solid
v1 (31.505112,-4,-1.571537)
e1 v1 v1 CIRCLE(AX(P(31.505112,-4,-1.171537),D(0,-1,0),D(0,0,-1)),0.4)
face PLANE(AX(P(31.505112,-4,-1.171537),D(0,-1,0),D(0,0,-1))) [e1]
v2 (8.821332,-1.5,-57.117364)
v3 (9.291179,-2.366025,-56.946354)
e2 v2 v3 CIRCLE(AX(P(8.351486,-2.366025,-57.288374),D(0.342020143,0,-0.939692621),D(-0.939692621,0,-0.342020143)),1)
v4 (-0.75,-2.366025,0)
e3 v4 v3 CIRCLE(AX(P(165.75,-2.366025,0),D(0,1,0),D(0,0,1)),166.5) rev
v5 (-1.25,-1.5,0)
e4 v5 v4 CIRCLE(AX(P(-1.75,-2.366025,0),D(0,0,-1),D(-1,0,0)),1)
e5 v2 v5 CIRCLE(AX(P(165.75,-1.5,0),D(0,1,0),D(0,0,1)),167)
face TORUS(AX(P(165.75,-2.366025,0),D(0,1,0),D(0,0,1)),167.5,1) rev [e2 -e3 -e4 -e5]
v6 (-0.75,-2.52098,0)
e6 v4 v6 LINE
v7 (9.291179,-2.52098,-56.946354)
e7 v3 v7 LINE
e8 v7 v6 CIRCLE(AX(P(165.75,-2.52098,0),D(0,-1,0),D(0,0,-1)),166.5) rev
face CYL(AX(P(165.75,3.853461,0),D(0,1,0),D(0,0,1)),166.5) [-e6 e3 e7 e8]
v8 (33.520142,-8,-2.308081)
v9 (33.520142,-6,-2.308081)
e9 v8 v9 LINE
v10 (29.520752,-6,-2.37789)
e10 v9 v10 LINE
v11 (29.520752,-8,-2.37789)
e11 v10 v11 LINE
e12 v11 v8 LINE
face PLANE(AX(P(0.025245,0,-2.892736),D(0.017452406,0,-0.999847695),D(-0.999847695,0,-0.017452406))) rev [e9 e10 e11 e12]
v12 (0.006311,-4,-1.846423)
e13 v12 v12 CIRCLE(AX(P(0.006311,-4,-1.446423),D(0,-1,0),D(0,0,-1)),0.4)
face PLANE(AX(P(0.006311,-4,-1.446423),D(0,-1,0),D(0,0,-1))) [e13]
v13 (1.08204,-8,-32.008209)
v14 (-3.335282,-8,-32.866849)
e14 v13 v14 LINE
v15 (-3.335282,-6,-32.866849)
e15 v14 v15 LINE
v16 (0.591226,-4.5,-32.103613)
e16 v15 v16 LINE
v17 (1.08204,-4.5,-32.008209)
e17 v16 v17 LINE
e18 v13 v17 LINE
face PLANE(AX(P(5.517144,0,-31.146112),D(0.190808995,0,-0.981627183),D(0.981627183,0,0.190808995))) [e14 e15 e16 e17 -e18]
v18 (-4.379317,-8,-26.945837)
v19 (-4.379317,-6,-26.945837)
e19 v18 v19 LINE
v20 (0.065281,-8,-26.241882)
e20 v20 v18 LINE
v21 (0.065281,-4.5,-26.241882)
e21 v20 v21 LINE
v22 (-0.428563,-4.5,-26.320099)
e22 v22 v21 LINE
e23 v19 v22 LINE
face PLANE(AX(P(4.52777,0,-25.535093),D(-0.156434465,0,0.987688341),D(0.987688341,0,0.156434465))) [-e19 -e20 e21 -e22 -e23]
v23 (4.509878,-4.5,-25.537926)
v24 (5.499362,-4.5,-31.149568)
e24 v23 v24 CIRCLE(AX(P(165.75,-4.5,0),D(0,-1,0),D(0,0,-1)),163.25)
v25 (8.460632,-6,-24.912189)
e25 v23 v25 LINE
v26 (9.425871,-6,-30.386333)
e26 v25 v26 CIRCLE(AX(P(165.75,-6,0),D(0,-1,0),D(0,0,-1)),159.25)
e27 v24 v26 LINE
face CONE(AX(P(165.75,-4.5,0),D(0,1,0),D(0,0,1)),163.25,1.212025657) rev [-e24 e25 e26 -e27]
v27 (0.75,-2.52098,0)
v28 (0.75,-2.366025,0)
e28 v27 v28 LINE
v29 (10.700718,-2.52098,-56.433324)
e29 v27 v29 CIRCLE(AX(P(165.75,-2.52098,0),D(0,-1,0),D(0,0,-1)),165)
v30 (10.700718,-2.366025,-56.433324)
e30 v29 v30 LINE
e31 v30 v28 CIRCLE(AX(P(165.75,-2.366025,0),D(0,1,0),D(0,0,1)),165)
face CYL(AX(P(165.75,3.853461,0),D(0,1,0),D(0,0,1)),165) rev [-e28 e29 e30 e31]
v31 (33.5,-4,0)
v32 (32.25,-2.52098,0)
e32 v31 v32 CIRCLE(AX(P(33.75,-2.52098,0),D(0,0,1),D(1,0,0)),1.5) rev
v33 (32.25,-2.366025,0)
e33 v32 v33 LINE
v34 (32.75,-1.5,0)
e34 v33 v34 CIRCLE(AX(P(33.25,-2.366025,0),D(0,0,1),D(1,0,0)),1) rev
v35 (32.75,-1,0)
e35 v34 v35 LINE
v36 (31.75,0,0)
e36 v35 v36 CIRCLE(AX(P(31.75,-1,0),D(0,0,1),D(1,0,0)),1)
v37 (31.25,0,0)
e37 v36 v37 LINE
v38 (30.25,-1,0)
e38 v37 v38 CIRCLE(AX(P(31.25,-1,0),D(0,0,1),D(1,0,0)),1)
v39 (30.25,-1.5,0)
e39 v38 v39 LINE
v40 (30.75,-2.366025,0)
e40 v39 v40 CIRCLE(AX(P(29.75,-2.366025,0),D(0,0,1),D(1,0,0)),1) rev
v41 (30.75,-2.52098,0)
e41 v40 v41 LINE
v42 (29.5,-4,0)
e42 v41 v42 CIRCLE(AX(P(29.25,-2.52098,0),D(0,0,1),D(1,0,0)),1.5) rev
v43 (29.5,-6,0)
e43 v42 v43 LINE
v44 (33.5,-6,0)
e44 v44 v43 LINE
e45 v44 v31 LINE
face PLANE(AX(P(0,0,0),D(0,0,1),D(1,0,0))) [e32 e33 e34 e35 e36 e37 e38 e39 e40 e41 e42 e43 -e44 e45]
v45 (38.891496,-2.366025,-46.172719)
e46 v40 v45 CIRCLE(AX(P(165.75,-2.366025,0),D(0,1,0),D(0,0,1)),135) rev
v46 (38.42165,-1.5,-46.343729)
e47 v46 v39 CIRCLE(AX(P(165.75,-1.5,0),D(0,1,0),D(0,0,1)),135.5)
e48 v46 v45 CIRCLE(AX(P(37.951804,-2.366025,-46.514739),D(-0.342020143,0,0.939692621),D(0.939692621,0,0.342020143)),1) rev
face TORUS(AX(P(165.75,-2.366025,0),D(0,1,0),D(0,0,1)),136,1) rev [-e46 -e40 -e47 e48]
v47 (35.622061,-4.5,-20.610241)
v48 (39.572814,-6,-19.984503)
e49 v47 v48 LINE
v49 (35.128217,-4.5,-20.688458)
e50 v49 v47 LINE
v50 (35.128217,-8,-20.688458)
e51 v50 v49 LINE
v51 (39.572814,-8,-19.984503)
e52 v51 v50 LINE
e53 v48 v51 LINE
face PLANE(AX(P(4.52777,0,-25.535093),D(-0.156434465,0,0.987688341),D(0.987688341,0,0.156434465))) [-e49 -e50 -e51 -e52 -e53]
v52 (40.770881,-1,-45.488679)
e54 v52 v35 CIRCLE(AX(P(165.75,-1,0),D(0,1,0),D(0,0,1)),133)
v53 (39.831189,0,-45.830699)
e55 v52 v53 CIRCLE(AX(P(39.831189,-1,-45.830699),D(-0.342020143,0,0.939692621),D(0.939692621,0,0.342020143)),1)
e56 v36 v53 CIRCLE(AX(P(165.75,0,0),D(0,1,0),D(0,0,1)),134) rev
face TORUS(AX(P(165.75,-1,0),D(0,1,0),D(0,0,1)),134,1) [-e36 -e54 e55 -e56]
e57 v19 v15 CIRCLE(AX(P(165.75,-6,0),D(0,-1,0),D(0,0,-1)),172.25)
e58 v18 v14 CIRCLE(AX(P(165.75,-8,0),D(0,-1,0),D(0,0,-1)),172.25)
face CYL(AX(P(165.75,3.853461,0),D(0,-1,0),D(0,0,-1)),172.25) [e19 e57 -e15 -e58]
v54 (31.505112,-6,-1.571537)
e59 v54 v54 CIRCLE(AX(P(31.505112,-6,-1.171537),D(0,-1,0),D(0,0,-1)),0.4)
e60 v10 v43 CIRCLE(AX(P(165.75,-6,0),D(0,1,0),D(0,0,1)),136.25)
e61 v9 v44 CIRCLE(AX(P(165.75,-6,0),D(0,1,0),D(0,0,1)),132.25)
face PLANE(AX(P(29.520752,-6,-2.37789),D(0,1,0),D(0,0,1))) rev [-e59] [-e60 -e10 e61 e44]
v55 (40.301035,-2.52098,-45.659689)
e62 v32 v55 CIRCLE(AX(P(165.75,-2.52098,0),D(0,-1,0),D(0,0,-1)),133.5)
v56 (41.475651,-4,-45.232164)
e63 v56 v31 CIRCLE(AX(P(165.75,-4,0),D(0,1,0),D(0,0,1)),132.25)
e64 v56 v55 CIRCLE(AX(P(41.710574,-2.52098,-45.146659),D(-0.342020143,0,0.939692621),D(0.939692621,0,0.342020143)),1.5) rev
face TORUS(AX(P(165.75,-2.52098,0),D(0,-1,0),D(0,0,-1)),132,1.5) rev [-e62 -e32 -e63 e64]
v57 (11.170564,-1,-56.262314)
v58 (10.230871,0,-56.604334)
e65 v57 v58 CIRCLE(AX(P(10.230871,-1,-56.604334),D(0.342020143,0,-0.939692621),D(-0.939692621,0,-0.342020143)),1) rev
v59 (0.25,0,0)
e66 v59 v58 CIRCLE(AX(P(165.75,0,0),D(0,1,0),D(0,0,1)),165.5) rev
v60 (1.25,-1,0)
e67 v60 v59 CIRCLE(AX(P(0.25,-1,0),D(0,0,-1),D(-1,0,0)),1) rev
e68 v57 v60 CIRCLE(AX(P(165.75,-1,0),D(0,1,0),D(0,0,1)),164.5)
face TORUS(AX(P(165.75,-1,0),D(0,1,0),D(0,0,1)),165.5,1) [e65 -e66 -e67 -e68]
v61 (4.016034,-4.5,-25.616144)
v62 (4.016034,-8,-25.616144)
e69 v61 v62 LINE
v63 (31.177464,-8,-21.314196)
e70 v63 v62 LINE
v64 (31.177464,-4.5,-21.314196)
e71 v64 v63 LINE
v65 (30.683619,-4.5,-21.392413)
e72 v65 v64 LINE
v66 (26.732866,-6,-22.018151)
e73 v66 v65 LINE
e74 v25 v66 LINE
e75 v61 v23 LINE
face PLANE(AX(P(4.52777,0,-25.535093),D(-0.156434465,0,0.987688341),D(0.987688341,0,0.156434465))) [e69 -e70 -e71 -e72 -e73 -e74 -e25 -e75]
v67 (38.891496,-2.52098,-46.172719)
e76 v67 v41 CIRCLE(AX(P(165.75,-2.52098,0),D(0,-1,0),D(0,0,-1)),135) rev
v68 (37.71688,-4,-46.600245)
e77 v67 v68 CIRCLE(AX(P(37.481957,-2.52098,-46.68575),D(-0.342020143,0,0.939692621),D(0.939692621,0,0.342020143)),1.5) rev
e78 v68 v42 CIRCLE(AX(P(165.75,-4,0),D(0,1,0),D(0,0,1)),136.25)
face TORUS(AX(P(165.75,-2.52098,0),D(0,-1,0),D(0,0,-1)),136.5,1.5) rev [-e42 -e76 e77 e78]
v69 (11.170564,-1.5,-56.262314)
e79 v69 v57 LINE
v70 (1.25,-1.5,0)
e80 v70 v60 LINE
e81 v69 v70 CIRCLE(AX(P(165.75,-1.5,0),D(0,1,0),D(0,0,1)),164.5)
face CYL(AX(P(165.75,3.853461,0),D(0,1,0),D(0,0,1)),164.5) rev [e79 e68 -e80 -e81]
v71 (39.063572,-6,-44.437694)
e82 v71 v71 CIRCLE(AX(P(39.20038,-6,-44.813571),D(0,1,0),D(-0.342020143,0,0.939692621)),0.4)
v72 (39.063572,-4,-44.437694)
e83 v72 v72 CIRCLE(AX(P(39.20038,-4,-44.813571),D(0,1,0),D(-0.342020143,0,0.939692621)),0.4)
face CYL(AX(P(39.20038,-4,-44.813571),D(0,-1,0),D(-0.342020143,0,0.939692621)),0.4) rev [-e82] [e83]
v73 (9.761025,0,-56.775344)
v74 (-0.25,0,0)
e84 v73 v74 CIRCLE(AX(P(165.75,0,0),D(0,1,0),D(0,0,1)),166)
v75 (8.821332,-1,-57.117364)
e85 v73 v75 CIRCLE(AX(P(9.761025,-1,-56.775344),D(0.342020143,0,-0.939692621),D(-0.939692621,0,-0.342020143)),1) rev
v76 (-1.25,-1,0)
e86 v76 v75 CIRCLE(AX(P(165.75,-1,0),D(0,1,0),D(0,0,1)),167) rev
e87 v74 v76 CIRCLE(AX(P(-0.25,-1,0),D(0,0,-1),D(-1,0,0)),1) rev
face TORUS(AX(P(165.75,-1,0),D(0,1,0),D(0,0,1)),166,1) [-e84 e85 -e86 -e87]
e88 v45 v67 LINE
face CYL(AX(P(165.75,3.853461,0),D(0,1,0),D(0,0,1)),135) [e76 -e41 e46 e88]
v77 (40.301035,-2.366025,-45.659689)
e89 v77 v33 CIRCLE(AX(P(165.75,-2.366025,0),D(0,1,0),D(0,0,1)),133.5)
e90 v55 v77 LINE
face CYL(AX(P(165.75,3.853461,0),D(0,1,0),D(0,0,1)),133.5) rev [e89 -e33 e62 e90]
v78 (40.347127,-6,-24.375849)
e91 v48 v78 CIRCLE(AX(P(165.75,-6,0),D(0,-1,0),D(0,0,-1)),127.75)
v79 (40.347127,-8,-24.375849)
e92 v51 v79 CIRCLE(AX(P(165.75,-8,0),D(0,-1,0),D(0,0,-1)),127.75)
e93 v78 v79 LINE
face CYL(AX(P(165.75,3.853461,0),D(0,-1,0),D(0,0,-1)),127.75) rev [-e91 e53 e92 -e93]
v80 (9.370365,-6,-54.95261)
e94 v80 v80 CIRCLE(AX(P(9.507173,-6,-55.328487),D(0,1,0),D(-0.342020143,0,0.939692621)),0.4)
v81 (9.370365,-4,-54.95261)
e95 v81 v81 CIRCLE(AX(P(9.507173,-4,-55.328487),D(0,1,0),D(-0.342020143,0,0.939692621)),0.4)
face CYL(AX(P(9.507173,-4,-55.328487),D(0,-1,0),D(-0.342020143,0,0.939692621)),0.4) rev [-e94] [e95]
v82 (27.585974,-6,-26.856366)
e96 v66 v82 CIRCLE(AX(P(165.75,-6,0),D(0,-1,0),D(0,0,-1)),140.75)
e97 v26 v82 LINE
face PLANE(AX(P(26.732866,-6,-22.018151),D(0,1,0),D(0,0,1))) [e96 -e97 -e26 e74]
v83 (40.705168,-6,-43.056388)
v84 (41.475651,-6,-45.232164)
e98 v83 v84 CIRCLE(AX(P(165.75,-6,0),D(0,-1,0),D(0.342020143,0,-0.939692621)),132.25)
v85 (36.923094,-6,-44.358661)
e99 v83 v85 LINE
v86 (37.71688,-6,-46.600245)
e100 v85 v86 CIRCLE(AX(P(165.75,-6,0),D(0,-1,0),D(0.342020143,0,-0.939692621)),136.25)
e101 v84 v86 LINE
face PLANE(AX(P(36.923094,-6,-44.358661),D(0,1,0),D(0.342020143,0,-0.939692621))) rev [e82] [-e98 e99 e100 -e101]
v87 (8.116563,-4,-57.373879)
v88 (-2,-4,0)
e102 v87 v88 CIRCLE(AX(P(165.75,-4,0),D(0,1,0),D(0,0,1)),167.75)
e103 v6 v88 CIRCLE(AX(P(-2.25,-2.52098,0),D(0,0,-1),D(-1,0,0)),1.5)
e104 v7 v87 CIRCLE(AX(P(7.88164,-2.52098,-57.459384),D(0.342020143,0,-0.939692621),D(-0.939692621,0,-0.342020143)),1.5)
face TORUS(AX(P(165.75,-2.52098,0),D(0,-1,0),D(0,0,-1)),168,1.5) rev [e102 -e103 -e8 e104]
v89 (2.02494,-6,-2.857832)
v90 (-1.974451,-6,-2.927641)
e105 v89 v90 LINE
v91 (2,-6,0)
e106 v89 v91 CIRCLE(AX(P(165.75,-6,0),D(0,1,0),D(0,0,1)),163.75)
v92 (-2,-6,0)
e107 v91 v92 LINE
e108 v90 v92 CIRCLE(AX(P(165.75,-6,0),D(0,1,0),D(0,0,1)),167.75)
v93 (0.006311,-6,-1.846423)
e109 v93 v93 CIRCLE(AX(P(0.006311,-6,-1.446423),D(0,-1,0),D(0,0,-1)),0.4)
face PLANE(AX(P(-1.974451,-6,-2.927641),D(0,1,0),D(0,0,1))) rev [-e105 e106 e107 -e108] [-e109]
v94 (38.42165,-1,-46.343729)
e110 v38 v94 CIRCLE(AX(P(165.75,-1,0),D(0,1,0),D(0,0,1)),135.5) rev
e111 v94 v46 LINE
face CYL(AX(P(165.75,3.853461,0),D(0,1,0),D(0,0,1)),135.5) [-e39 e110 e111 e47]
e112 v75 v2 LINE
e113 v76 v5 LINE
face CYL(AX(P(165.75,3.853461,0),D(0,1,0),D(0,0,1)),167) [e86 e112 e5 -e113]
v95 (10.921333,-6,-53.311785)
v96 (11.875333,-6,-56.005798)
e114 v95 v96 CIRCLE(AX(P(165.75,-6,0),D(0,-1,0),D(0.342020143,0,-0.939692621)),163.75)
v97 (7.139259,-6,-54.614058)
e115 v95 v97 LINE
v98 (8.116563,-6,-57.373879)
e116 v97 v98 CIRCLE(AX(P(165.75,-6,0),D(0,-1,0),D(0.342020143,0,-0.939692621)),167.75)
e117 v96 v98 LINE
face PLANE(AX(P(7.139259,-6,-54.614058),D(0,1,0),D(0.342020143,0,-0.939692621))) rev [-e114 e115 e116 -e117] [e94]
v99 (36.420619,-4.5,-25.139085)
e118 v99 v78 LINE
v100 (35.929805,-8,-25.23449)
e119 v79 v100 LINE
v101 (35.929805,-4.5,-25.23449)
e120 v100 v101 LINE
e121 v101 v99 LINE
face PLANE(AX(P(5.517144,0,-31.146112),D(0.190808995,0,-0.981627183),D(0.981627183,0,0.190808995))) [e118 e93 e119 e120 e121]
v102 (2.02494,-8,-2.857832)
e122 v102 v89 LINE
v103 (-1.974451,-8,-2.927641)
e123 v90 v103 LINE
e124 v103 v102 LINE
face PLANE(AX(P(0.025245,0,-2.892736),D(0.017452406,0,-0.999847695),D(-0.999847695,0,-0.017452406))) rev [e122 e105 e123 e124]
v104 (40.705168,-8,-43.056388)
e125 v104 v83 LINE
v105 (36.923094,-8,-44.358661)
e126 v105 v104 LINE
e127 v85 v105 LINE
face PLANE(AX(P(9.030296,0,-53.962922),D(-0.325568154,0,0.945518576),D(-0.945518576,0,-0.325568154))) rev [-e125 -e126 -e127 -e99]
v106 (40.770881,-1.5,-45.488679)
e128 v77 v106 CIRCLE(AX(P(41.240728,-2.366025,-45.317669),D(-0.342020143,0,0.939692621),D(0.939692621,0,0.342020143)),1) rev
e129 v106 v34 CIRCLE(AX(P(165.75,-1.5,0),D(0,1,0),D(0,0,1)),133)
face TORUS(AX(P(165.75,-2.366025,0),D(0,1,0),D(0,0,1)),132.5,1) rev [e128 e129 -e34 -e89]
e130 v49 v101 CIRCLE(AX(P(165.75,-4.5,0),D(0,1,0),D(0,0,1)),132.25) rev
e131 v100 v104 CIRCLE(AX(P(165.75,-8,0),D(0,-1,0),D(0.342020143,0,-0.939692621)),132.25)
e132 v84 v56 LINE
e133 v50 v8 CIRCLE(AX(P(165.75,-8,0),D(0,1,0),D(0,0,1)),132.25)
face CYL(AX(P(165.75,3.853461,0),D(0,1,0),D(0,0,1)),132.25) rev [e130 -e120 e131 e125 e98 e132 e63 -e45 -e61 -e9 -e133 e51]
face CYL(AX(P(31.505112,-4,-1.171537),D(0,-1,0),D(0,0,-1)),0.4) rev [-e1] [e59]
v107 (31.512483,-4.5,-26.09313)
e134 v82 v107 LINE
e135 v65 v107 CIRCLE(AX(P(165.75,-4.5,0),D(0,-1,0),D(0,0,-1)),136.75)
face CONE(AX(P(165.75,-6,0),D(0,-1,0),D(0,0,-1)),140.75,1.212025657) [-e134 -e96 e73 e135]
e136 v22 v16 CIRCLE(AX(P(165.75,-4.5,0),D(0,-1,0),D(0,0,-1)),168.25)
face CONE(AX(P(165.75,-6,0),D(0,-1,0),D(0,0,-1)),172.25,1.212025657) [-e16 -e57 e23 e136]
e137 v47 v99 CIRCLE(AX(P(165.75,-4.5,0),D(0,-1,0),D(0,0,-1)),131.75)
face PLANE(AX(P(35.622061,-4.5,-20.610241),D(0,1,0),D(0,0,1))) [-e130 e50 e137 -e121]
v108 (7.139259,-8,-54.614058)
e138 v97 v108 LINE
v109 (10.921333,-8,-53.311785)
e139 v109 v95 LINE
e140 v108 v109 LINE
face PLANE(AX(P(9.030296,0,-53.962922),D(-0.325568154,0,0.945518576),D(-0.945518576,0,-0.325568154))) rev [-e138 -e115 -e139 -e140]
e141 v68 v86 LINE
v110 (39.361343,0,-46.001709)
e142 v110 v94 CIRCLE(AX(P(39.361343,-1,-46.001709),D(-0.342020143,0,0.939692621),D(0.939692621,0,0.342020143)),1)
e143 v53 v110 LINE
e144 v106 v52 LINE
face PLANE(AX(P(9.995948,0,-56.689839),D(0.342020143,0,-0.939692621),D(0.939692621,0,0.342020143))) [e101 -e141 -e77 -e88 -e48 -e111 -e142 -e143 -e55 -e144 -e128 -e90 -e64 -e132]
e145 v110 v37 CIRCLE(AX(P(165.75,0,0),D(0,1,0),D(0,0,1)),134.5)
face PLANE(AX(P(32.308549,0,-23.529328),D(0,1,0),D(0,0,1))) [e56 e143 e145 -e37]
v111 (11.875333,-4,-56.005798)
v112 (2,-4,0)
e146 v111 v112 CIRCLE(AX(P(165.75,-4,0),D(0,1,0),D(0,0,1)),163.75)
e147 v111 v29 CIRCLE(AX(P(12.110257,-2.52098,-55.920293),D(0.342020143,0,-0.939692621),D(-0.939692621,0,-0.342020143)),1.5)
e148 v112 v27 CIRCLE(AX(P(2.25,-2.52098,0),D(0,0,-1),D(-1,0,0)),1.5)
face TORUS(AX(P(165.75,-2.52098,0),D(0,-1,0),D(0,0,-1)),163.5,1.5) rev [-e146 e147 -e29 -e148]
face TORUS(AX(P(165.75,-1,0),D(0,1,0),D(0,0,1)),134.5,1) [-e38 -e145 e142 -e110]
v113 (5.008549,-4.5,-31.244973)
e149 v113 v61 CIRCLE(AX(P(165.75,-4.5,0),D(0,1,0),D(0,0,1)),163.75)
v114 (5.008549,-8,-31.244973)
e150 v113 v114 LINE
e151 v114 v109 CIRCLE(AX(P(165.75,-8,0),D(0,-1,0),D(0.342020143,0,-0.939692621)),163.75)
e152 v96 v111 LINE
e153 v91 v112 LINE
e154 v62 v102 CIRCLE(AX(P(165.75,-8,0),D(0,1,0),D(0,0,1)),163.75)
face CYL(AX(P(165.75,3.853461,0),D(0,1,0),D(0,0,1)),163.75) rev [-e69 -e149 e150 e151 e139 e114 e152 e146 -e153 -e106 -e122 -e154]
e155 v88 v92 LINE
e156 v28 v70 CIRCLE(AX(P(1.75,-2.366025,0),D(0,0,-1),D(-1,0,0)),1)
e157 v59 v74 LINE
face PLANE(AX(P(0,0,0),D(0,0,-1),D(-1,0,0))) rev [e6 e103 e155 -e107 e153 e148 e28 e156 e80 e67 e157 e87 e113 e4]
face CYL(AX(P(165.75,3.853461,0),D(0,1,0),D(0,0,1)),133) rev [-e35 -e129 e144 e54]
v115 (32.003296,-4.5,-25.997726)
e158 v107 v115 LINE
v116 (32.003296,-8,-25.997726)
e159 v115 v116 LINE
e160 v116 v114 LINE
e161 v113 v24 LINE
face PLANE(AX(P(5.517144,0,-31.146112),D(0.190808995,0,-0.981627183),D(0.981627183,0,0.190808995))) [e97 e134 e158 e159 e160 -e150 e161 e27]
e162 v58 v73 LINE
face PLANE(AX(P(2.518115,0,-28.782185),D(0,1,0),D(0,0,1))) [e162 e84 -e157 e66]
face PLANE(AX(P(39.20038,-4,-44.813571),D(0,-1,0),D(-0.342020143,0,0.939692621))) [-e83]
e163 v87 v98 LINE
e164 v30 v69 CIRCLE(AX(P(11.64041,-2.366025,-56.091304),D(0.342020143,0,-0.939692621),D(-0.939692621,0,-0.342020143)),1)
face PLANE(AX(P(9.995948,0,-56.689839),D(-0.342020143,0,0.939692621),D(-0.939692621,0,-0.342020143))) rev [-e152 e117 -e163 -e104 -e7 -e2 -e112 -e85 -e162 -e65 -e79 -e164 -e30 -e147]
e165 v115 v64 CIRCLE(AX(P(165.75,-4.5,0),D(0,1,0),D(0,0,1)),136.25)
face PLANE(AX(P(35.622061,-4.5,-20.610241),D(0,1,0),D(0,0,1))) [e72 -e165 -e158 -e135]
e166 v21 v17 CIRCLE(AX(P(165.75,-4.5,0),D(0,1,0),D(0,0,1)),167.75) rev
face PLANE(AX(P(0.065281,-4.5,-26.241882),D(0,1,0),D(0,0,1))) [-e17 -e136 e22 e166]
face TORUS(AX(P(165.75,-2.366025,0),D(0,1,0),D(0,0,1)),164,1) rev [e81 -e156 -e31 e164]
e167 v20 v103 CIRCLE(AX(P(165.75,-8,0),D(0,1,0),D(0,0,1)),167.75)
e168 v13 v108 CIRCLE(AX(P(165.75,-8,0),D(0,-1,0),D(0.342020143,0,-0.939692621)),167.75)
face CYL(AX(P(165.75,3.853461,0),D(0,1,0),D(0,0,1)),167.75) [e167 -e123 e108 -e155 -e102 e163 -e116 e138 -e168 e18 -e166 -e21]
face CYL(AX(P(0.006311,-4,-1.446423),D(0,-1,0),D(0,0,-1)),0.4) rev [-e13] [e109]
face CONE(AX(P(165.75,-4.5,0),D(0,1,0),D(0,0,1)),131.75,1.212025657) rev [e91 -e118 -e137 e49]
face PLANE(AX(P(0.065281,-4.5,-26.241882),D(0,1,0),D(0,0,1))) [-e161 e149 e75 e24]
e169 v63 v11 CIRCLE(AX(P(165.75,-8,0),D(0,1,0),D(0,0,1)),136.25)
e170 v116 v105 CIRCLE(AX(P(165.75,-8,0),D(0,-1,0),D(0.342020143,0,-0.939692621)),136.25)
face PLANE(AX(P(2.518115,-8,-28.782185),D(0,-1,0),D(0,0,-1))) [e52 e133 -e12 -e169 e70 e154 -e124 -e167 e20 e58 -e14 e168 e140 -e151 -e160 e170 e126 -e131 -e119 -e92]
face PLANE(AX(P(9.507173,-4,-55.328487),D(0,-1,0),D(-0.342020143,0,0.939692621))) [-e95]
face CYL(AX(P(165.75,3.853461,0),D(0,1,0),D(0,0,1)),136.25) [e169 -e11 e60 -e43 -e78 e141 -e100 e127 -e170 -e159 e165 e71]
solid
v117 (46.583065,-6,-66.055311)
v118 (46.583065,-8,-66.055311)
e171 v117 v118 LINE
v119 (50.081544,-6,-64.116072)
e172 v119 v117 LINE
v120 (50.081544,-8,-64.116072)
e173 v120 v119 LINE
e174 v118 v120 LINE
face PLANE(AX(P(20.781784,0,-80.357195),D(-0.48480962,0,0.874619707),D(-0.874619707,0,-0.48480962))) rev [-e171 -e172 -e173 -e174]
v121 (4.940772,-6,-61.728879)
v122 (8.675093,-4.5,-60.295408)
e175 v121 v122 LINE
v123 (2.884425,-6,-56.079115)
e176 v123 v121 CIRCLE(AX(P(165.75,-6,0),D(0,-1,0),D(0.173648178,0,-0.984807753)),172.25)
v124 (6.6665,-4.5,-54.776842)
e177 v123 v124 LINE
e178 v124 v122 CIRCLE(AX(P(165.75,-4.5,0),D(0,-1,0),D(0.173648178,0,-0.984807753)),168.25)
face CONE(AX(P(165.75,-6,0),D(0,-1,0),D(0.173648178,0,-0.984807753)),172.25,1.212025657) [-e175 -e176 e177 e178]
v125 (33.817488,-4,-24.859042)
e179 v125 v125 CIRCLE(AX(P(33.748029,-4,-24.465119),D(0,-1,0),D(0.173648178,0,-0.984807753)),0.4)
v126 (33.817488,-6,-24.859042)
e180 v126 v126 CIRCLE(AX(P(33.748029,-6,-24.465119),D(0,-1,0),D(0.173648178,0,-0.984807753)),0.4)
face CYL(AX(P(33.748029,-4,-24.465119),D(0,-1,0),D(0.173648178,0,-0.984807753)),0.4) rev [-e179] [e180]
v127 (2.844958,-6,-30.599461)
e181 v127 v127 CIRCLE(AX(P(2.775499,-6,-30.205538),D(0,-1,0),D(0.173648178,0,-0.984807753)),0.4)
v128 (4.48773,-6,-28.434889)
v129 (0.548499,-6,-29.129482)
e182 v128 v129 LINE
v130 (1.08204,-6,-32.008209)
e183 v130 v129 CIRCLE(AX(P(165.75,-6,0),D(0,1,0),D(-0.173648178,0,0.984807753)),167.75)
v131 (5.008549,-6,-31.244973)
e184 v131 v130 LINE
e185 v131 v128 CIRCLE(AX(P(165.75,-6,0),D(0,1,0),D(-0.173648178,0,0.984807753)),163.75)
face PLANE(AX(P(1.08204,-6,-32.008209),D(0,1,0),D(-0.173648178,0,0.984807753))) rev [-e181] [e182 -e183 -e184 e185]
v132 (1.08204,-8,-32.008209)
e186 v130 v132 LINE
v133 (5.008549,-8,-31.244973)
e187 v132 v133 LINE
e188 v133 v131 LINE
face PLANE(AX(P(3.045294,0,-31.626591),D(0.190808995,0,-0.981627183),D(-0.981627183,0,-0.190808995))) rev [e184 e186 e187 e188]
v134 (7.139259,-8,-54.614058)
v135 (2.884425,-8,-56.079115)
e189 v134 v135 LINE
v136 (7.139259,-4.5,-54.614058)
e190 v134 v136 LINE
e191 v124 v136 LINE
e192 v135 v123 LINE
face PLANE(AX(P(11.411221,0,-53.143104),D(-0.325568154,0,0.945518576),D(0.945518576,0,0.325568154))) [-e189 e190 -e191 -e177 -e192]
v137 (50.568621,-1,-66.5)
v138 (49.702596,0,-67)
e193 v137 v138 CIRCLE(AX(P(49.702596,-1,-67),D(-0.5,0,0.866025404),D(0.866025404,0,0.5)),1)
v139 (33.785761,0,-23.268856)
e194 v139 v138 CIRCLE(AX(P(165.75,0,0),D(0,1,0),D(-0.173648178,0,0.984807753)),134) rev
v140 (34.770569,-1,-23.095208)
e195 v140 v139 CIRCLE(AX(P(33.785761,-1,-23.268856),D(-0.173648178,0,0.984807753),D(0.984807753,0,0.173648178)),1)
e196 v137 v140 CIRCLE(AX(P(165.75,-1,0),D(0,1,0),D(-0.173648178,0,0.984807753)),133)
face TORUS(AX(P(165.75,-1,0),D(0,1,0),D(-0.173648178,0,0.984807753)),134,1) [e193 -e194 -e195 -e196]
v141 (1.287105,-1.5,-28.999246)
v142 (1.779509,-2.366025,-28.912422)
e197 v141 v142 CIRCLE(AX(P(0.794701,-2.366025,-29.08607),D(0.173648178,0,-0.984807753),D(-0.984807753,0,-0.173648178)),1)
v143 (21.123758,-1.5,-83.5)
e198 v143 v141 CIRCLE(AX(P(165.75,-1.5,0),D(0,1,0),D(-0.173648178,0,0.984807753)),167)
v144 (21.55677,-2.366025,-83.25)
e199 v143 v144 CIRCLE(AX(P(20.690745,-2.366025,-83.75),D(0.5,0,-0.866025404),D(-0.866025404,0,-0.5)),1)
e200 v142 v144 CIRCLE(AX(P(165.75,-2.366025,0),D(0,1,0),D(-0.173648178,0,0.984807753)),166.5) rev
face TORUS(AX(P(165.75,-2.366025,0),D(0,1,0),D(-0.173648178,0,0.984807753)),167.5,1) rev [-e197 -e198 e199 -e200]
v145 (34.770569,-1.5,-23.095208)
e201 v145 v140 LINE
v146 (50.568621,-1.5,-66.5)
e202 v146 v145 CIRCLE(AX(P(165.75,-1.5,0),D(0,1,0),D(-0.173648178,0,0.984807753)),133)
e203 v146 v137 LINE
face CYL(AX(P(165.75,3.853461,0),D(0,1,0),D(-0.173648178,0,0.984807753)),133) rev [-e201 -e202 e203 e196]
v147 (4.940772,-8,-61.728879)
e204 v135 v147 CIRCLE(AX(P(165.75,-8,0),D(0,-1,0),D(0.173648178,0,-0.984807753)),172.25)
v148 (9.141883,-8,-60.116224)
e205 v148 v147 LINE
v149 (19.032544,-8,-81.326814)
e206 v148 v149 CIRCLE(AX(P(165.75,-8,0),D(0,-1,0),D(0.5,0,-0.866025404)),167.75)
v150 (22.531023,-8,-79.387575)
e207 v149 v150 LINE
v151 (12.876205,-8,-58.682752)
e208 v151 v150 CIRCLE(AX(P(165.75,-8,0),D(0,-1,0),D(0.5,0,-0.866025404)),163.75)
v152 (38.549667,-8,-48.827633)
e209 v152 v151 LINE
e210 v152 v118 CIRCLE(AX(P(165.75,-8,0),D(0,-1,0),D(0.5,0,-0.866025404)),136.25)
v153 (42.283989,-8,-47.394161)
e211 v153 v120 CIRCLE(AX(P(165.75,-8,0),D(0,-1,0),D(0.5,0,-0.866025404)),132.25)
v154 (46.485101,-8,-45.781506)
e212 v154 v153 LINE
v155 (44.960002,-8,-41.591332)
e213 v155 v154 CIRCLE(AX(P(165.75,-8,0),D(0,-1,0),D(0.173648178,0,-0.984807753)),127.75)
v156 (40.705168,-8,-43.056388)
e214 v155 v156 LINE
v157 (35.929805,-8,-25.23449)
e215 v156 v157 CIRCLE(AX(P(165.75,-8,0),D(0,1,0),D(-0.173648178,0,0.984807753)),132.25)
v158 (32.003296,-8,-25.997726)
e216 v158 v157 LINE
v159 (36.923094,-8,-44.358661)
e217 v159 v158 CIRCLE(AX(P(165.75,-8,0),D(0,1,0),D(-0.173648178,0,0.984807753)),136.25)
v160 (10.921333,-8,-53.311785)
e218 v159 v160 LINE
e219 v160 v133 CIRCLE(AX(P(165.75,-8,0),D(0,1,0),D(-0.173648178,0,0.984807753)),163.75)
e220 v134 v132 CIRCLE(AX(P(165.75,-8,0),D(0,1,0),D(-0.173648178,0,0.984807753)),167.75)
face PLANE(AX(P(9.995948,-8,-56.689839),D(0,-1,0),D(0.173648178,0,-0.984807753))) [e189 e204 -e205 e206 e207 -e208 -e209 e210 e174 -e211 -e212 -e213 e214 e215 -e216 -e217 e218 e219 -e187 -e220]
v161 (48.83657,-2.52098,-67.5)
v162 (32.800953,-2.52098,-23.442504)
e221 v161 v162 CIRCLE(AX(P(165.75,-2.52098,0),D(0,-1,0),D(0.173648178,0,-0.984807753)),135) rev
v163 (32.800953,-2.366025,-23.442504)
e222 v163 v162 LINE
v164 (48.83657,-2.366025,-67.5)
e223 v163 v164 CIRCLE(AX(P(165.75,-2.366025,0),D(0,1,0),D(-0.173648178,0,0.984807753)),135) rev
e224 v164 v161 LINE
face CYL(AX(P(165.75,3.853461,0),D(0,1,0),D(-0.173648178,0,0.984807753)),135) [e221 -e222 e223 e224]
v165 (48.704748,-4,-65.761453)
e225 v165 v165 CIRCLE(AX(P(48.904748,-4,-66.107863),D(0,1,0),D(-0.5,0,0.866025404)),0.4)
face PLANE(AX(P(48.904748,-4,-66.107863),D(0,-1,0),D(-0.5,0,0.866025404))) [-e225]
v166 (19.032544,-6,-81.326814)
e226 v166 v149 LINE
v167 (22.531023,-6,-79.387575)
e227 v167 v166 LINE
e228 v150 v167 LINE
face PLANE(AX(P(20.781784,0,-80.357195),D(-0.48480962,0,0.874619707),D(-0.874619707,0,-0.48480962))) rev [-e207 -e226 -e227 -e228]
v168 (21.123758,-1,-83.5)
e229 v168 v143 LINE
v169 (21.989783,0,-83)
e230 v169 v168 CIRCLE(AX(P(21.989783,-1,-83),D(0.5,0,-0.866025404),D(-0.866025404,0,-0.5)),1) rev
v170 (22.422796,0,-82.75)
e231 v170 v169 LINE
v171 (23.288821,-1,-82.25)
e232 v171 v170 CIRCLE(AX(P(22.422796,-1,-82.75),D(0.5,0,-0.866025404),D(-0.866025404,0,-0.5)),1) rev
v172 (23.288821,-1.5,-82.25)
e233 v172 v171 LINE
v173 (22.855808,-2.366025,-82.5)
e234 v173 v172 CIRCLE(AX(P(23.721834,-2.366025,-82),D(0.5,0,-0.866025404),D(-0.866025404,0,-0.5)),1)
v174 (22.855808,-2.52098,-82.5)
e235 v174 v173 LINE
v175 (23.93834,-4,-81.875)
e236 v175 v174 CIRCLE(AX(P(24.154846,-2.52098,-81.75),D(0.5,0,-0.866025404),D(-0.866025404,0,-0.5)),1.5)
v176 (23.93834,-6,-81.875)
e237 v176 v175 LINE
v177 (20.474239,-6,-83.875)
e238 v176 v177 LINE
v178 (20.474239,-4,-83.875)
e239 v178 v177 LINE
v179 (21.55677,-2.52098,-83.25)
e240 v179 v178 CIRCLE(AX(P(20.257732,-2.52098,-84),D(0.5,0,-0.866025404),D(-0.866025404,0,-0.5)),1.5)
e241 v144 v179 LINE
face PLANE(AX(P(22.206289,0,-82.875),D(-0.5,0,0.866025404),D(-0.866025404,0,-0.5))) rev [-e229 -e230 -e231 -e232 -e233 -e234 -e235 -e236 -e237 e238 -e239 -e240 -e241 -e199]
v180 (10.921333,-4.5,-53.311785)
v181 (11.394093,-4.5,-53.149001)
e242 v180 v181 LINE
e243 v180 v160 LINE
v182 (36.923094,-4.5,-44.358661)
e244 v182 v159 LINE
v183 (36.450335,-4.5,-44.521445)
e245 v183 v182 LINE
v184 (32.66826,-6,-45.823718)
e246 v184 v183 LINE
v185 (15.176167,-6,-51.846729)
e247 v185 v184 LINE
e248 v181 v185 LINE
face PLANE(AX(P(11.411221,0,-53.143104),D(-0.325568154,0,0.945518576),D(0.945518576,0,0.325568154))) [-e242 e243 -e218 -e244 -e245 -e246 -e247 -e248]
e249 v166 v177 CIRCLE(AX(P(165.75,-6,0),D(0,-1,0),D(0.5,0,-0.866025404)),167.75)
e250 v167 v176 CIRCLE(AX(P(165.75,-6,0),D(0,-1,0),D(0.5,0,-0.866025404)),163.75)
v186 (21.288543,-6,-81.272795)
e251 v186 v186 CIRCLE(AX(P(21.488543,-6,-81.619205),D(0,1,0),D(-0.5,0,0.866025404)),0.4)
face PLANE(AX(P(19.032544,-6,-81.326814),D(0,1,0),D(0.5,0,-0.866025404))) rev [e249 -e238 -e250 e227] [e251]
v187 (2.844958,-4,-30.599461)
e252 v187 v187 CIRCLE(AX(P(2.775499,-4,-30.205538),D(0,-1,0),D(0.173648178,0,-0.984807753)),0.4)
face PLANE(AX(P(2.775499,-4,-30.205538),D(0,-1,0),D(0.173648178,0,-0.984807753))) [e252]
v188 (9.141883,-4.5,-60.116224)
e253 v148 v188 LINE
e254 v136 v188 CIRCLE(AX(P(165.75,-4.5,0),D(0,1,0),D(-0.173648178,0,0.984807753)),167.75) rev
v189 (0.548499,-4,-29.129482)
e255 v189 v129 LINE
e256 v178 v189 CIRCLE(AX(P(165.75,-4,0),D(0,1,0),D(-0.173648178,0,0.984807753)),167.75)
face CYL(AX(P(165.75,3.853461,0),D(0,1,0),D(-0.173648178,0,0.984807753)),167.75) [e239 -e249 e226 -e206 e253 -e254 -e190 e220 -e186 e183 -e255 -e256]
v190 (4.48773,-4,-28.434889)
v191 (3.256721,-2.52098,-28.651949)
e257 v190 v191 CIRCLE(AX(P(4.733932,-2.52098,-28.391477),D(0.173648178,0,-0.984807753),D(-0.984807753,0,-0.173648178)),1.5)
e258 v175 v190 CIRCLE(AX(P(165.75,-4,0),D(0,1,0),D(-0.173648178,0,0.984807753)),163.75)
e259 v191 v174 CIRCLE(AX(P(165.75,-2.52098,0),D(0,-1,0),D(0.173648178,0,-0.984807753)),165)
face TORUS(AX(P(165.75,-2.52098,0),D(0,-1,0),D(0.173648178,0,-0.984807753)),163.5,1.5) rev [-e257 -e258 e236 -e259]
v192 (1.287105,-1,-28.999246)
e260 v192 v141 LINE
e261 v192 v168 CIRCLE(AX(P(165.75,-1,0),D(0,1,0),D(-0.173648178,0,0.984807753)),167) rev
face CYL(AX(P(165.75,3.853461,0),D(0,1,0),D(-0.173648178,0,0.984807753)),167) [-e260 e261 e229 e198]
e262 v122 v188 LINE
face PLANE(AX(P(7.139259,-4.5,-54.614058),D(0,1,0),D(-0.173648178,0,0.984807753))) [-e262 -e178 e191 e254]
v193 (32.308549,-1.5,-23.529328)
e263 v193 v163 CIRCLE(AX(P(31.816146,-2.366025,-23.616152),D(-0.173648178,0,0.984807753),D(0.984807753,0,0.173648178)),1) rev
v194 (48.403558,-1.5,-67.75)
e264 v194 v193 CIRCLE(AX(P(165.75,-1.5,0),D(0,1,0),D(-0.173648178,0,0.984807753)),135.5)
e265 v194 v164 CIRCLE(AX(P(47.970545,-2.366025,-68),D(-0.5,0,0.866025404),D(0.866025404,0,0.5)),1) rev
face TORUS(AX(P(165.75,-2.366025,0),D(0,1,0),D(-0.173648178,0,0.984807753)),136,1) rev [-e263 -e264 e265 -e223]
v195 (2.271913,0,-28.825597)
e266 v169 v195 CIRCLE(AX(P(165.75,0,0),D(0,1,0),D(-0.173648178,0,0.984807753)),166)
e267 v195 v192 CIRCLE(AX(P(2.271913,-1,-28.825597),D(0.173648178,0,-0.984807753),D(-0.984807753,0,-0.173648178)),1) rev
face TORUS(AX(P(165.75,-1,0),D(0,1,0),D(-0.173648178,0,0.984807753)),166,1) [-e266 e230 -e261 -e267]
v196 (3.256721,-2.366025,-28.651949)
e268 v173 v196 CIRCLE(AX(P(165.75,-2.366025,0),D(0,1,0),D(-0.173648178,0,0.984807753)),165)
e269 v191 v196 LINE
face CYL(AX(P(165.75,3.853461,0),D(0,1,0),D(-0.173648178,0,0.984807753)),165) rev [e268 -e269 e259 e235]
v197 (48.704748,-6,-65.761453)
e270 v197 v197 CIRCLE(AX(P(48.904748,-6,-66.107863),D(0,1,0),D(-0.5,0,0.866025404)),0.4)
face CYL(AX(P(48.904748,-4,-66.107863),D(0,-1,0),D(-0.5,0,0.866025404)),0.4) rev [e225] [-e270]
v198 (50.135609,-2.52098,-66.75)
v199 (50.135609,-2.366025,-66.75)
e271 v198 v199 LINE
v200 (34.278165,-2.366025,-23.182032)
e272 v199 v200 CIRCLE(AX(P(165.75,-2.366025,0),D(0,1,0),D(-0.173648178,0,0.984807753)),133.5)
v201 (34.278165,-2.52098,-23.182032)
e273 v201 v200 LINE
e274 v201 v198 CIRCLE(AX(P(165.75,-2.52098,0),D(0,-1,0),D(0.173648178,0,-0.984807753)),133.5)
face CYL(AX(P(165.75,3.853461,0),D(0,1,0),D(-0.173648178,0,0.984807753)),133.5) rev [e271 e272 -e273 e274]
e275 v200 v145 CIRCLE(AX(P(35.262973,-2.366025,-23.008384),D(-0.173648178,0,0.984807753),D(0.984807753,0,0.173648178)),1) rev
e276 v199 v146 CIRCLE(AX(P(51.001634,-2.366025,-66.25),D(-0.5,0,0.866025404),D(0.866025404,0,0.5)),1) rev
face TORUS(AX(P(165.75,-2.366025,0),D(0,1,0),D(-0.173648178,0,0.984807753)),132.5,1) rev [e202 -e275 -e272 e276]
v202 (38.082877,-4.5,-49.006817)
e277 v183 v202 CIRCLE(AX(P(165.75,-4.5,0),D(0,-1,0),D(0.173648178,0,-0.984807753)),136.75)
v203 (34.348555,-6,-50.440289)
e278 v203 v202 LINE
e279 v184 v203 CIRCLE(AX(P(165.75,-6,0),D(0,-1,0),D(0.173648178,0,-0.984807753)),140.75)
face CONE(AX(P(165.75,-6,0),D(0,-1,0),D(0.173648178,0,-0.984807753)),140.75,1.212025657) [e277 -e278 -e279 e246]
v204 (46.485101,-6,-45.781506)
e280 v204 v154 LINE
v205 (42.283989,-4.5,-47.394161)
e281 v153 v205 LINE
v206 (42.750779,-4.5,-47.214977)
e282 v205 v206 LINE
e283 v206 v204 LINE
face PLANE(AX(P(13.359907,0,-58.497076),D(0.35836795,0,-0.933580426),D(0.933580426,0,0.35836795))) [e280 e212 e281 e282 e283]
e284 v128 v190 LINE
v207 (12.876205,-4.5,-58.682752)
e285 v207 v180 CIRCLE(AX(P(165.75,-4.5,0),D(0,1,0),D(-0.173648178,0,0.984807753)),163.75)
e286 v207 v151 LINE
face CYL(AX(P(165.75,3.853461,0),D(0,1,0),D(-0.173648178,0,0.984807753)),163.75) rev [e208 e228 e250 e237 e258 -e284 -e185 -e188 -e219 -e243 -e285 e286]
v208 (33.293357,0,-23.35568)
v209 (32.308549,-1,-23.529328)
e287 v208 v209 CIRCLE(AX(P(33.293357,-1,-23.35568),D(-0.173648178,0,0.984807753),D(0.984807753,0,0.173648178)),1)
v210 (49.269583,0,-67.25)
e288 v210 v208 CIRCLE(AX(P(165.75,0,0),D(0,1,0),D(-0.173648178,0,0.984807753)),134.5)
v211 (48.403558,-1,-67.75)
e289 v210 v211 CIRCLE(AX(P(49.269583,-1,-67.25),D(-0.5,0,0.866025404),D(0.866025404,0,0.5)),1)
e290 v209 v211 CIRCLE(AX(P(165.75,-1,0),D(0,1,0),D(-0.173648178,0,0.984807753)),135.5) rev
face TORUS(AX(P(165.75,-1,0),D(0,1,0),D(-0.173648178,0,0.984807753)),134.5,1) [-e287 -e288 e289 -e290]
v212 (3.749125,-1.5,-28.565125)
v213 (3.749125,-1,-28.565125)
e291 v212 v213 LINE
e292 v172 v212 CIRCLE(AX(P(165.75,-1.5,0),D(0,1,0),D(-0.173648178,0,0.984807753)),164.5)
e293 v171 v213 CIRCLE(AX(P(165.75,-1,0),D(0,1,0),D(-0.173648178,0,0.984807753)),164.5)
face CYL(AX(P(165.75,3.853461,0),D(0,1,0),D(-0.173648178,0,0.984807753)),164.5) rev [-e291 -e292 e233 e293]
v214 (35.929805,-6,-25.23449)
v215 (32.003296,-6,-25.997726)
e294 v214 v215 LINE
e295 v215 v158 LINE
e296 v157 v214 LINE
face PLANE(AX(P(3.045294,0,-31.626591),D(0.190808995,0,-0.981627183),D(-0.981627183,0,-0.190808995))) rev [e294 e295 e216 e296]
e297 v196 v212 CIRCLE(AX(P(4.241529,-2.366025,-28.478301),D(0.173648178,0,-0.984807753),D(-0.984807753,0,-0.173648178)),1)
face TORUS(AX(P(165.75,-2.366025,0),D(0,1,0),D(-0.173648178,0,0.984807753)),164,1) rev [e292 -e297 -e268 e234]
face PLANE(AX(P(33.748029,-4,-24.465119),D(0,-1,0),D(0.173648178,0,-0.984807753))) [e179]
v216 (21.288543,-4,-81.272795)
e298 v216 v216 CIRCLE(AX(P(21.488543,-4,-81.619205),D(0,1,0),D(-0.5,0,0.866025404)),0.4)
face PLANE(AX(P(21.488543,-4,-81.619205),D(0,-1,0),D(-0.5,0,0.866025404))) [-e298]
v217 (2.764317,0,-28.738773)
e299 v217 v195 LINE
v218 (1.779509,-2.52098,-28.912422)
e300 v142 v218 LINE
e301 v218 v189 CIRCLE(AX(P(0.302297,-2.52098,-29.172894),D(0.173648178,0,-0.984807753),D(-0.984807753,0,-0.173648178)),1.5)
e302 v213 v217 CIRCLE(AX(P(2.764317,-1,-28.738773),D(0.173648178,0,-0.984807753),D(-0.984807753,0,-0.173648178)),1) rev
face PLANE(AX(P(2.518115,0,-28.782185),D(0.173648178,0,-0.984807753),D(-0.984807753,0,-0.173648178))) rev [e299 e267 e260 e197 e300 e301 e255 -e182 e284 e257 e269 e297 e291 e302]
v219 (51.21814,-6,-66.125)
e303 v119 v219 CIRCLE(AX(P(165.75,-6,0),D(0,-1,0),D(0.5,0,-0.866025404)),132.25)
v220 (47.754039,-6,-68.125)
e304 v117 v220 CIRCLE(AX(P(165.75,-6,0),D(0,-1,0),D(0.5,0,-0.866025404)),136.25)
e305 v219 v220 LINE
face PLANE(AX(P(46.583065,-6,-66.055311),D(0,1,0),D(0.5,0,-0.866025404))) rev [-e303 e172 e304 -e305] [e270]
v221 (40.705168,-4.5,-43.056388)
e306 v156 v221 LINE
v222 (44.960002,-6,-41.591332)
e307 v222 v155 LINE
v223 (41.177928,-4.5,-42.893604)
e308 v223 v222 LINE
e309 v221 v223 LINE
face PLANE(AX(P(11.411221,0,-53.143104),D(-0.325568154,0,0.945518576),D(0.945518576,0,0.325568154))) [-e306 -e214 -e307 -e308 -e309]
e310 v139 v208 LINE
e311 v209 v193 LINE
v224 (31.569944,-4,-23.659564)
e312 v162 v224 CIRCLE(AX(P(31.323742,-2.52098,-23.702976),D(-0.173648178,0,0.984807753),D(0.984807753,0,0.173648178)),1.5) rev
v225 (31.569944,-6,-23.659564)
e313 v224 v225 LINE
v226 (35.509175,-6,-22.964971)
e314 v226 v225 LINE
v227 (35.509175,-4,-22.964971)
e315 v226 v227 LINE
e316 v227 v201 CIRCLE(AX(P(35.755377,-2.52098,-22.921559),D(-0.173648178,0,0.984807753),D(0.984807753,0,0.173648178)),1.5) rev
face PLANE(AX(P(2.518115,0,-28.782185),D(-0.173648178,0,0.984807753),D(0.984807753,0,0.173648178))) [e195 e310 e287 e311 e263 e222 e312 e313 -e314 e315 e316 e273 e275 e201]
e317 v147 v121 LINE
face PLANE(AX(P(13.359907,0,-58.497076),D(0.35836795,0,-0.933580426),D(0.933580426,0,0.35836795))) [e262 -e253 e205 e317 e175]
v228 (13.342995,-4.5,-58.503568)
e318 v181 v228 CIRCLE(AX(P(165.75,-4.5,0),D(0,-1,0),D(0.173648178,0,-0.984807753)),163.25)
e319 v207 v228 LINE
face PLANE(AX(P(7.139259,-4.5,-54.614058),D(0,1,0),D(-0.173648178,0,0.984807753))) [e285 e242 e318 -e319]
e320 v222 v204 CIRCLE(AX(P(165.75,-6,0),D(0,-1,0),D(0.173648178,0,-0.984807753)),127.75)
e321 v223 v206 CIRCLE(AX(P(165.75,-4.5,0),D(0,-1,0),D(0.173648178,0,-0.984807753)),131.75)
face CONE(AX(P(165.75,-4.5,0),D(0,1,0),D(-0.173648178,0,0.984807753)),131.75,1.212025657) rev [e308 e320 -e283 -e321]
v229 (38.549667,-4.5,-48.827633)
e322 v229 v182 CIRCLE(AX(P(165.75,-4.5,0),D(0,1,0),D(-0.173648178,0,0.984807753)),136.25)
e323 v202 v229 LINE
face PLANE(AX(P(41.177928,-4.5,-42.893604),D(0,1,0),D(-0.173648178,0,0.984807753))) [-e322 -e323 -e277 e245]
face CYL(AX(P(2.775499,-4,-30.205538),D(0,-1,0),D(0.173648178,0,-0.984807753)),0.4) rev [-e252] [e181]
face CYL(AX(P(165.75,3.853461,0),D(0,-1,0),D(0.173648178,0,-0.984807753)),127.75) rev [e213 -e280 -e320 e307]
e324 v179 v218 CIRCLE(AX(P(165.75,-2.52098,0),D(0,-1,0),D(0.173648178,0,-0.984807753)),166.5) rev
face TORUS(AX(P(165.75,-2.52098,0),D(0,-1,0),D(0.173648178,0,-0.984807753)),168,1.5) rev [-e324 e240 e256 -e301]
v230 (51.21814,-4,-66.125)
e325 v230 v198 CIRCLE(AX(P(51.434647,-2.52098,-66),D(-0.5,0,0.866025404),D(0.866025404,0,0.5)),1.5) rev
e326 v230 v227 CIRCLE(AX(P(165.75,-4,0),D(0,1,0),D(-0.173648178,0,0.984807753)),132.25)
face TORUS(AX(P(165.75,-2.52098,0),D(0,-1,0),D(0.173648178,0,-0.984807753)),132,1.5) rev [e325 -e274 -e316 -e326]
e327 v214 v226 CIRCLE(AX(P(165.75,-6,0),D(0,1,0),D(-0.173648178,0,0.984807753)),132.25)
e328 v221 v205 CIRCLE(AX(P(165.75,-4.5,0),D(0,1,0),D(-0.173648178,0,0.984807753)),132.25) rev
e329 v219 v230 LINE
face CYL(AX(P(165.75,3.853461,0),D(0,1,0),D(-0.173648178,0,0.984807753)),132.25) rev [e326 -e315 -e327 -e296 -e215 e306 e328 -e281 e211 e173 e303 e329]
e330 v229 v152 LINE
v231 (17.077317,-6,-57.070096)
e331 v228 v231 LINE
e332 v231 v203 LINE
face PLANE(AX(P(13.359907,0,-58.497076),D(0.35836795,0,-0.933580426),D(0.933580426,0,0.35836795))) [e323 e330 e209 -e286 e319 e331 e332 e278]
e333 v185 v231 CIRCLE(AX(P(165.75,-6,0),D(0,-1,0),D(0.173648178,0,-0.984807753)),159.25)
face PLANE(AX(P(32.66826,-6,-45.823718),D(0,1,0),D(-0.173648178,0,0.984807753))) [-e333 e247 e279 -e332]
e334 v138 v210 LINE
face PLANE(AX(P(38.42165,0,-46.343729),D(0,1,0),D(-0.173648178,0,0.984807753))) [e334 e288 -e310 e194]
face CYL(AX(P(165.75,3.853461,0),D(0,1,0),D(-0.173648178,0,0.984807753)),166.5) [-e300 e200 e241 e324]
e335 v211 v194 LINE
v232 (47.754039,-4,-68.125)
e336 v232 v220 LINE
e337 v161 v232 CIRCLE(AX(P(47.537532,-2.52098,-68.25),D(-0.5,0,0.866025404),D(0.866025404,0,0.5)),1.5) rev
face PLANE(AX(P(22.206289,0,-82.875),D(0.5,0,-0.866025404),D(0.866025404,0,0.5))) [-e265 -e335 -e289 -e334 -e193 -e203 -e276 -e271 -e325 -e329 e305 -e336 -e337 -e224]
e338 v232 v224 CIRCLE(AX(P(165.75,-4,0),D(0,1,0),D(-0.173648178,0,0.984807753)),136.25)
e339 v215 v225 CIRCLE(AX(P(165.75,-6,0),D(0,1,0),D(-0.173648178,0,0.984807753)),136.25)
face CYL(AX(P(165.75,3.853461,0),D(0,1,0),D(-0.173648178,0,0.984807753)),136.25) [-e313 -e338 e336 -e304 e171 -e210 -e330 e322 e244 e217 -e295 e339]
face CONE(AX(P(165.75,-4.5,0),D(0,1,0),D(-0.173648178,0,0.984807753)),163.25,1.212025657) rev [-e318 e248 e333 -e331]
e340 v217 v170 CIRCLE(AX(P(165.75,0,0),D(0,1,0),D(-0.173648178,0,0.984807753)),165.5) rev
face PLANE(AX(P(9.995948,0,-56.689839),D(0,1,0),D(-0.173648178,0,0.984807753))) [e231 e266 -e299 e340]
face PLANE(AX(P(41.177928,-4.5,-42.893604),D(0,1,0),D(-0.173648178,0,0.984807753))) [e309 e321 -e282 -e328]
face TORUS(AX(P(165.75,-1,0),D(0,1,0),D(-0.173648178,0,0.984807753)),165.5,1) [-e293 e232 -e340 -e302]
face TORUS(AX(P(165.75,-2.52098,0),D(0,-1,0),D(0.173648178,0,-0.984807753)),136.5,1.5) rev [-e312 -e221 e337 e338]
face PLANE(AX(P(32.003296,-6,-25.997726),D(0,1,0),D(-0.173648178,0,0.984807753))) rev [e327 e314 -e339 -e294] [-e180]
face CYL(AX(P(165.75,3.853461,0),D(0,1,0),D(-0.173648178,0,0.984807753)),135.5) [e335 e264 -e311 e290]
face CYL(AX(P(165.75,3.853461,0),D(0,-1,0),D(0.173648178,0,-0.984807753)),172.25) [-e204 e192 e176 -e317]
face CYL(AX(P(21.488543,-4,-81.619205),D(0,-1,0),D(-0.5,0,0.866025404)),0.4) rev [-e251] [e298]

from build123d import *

# Parameters (mm, degrees)
REVOLVE_1_ANGLE          = 10
FILLET_1_R               = 1.5
FILLET_2_R               = 1.5
FILLET_3_R               = 1
FILLET_4_R               = 1
SKETCH_7_W               = 4
SKETCH_7_H               = 2
CUT_REVOLVE_1_ANGLE      = 1
SKETCH_10_R              = 0.4
CUT_EXTRUDE_1_DEPTH      = 2
REVOLVE_2_ANGLE          = 1
PATTERN_CIRCULAR_1_COUNT = 2
PATTERN_CIRCULAR_1_ANGLE = 10


with BuildPart() as part:
    # 草图4 → 旋转1 (revolve)
    with BuildSketch(Plane.XY):
        Polygon((0.75, -1.5), (1.25, -1.5), (1.25, 0), (0, 0), (-1.25, 0), (-1.25, -1.5), (-0.75, -1.5), (-0.75, -4), (-2, -4), (-2, -8), (0, -8), (2, -8), (2, -4), (0.75, -4), align=None)
        Polygon((31.5, 0), (32.75, 0), (32.75, -1.5), (32.25, -1.5), (32.25, -4), (33.5, -4), (33.5, -8), (31.5, -8), (29.5, -8), (29.5, -4), (30.75, -4), (30.75, -1.5), (30.25, -1.5), (30.25, 0), align=None)
    revolve(axis=Axis((165.75, 3.853460973, 0), (0, -1, 0)), revolution_arc=REVOLVE_1_ANGLE)

    # 圆角1
    # the kernel refuses this fillet: 1.5 mm, written as the material it adds along each edge
    with BuildSketch(Plane(origin=(165.75, -4, 0), x_dir=(-1, 0, 0), z_dir=(0, 0, 1))) as fillet_1_piece_1:
        with BuildLine():
            CenterArc((163.5, -1.479019946), FILLET_1_R, 0, 80.405931773)
            Line((165, -1.479019946), (165.03, -1.479019946))
            Line((165.03, -1.479019946), (165.03, 0))
            Line((165.03, 0), (165, 0.03))
            ThreePointArc((165, 0.03), (164.375, 0.03), (163.755, 0.029580399))
            Line((163.755, 0.029580399), (163.75, 0))
        make_face()
    revolve(axis=Axis((165.75, -4, 0), (0, -1, 0)), revolution_arc=10)
    with BuildSketch(Plane(origin=(165.75, -4, 0), x_dir=(-1, 0, 0), z_dir=(0, 0, 1))) as fillet_1_piece_2:
        with BuildLine():
            CenterArc((168, -1.479019946), FILLET_1_R, 99.594068227, 80.405931773)
            Line((166.5, -1.479019946), (166.47, -1.479019946))
            Line((166.47, -1.479019946), (166.47, 0))
            Line((166.47, 0), (166.5, 0.03))
            ThreePointArc((166.5, 0.03), (167.125, 0.03), (167.745, 0.029580399))
            Line((167.745, 0.029580399), (167.75, 0))
        make_face()
    revolve(axis=Axis((165.75, -4, 0), (0, -1, 0)), revolution_arc=10)

    # 圆角2
    # the kernel refuses this fillet: 1.5 mm, written as the material it adds along each edge
    with BuildSketch(Plane(origin=(165.75, -4, 0), x_dir=(-1, 0, 0), z_dir=(0, 0, 1))) as fillet_2_piece_1:
        with BuildLine():
            CenterArc((136.5, -1.479019946), FILLET_2_R, 99.594068227, 80.405931773)
            Line((136.25, 0), (136.245, 0.029580399))
            ThreePointArc((136.245, 0.029580399), (135.625, 0.03), (135, 0.03))
            Line((135, 0.03), (134.97, 0))
            Line((134.97, 0), (134.97, -1.479019946))
            Line((134.97, -1.479019946), (135, -1.479019946))
        make_face()
    revolve(axis=Axis((165.75, -4, 0), (0, -1, 0)), revolution_arc=10)
    with BuildSketch(Plane(origin=(165.75, -4, 0), x_dir=(-1, 0, 0), z_dir=(0, 0, 1))) as fillet_2_piece_2:
        with BuildLine():
            CenterArc((132, -1.479019946), FILLET_2_R, 0, 80.405931773)
            Line((133.5, -1.479019946), (133.53, -1.479019946))
            Line((133.53, -1.479019946), (133.53, 0))
            Line((133.53, 0), (133.5, 0.03))
            ThreePointArc((133.5, 0.03), (132.875, 0.03), (132.255, 0.029580399))
            Line((132.255, 0.029580399), (132.25, 0))
        make_face()
    revolve(axis=Axis((165.75, -4, 0), (0, -1, 0)), revolution_arc=10)

    # 圆角3
    # the kernel refuses this fillet: 1 mm, written as the material it adds along each edge
    with BuildSketch(Plane(origin=(165.75, -1.5, 0), x_dir=(-1, 0, 0), z_dir=(0, 0, 1))) as fillet_3_piece_1:
        with BuildLine():
            CenterArc((136, 0.866025404), FILLET_3_R, 180, 60)
            Line((135, 0.866025404), (135, 0))
            Line((135, 0), (135.5, 0))
        make_face()
    revolve(axis=Axis((165.75, -1.5, 0), (0, -1, 0)), revolution_arc=10)
    with BuildSketch(Plane(origin=(165.75, -1.5, 0), x_dir=(-1, 0, 0), z_dir=(0, 0, 1))) as fillet_3_piece_2:
        with BuildLine():
            CenterArc((132.5, 0.866025404), FILLET_3_R, 300, 60)
            Line((133, 0), (133.5, 0))
            Line((133.5, 0), (133.5, 0.866025404))
        make_face()
    revolve(axis=Axis((165.75, -1.5, 0), (0, -1, 0)), revolution_arc=10)
    # the kernel refuses this fillet: 1 mm, written as the material it takes off along each edge
    with BuildSketch(Plane(origin=(165.75, 0, 0), x_dir=(-0.9998233399867428, 0, 0.018795978765534377), z_dir=(0.018795978765534377, 0, 0.9998233399867428))) as fillet_3_2_piece_1:
        with BuildLine():
            CenterArc((133 + FILLET_3_R, FILLET_3_R), FILLET_3_R, 180, 90)
            Line((133, FILLET_3_R), (133, 0))
            Line((133, 0), (133 + FILLET_3_R, 0))
        make_face()
    revolve(axis=Axis((165.75, 0, 0), (0, -1, 0)), revolution_arc=12.153987353, mode=Mode.SUBTRACT)
    with BuildSketch(Plane(origin=(165.75, 0, 0), x_dir=(-0.9998297984864879, 0, 0.01844922921070363), z_dir=(0.01844922921070363, 0, 0.9998297984864879))) as fillet_3_2_piece_2:
        with BuildLine():
            CenterArc((135.5 - FILLET_3_R, FILLET_3_R), FILLET_3_R, 270, 90)
            Line((135.5 - FILLET_3_R, 0), (135.5, 0))
            Line((135.5, 0), (135.5, FILLET_3_R))
        make_face()
    revolve(axis=Axis((165.75, 0, 0), (0, -1, 0)), revolution_arc=12.114245889, mode=Mode.SUBTRACT)

    # 圆角4
    # the kernel refuses this fillet: 1 mm, written as the material it adds along each edge
    with BuildSketch(Plane(origin=(165.75, -1.5, 0), x_dir=(-1, 0, 0), z_dir=(0, 0, 1))) as fillet_4_piece_1:
        with BuildLine():
            CenterArc((167.5, 0.866025404), FILLET_4_R, 180, 60)
            Line((167, 0), (166.5, 0))
            Line((166.5, 0), (166.5, 0.866025404))
        make_face()
    revolve(axis=Axis((165.75, -1.5, 0), (0, -1, 0)), revolution_arc=10)
    with BuildSketch(Plane(origin=(165.75, -1.5, 0), x_dir=(-1, 0, 0), z_dir=(0, 0, 1))) as fillet_4_piece_2:
        with BuildLine():
            CenterArc((164, 0.866025404), FILLET_4_R, 300, 60)
            Line((164.5, 0), (165, 0))
            Line((165, 0), (165, 0.866025404))
        make_face()
    revolve(axis=Axis((165.75, -1.5, 0), (0, -1, 0)), revolution_arc=10)
    # the kernel refuses this fillet: 1 mm, written as the material it takes off along each edge
    with BuildSketch(Plane(origin=(165.75, 0, 0), x_dir=(-0.9998845180351503, 0, 0.015197058715919934), z_dir=(0.015197058715919934, 0, 0.9998845180351503))) as fillet_4_2_piece_1:
        with BuildLine():
            CenterArc((164.5 + FILLET_4_R, FILLET_4_R), FILLET_4_R, 180, 90)
            Line((164.5, FILLET_4_R), (164.5, 0))
            Line((164.5, 0), (164.5 + FILLET_4_R, 0))
        make_face()
    revolve(axis=Axis((165.75, 0, 0), (0, -1, 0)), revolution_arc=11.74152169, mode=Mode.SUBTRACT)
    with BuildSketch(Plane(origin=(165.75, 0, 0), x_dir=(-0.9998879496351009, 0, 0.014969574961036002), z_dir=(0.014969574961036002, 0, 0.9998879496351009))) as fillet_4_2_piece_2:
        with BuildLine():
            CenterArc((167 - FILLET_4_R, FILLET_4_R), FILLET_4_R, 270, 90)
            Line((167 - FILLET_4_R, 0), (167, 0))
            Line((167, 0), (167, FILLET_4_R))
        make_face()
    revolve(axis=Axis((165.75, 0, 0), (0, -1, 0)), revolution_arc=11.715451006, mode=Mode.SUBTRACT)

    # 草图7 → 切除-旋转1 (revolve, cut)
    with BuildSketch(Plane.XY):
        with Locations((0, -7)):
            Rectangle(SKETCH_7_W, SKETCH_7_H)
        with Locations((31.5, -7)):
            Rectangle(SKETCH_7_W, SKETCH_7_H)
    revolve(axis=Axis((165.75, 3.853460973, 0), (0, -1, 0)), revolution_arc=CUT_REVOLVE_1_ANGLE, mode=Mode.SUBTRACT)

    # 草图10 → 切除-拉伸1 (cut)
    with BuildSketch(Plane.XZ.offset(6)):
        with Locations(Location((0.006311252, -1.446423259, 0), (0, 0, 270))):
            Circle(SKETCH_10_R)
        with Locations(Location((31.505111829, -1.171537391, 0), (0, 0, 270))):
            Circle(SKETCH_10_R)
    extrude(amount=-CUT_EXTRUDE_1_DEPTH, mode=Mode.SUBTRACT)

    # 草图11 → 旋转2 (revolve)
    with BuildSketch(Plane(origin=(4.997974052, 0, -28.344919378), x_dir=(-0.9848077530122081, 0, -0.17364817766693072), z_dir=(0.17364817766693072, 0, -0.9848077530122081))):
        Polygon((-26.981885062, -4.5), (-26.481885062, -4.5), (-22.481885062, -6), (-3.981885062, -6), (0.018114938, -4.5), (0.518114938, -4.5), (4.518114938, -4.5), (5.018114938, -4.5), (9.018114938, -6), (9.018114938, -8), (4.518114938, -8), (0.518114938, -8), (-26.981885062, -8), (-30.981885062, -8), (-35.481885062, -8), (-35.481885062, -6), (-31.481885062, -4.5), (-30.981885062, -4.5), align=None)
    revolve(axis=Axis((165.75, 3.853460973, 0), (0, 1, 0)), revolution_arc=REVOLVE_2_ANGLE)

    # 镜向1: part across face


with BuildPart() as part_1:
    add(part.part)
    add(part.part.mirror(Plane(origin=(18.028837048, -5.996688627, -26.04722665), x_dir=(0.9848077529548817, 0, 0.17364817799204443), z_dir=(0.17364817799204443, 0, -0.9848077529548818))))


with BuildPart() as pattern_circular_1_1:
    # 阵列(圆周)1: pattern copy
    add(part_1.part.rotate(Axis((165.75, 0, 0), (0, -1, 0)), 1 * PATTERN_CIRCULAR_1_ANGLE / (PATTERN_CIRCULAR_1_COUNT - 1)))


solid = Compound([part_1.part, pattern_circular_1_1.part])
